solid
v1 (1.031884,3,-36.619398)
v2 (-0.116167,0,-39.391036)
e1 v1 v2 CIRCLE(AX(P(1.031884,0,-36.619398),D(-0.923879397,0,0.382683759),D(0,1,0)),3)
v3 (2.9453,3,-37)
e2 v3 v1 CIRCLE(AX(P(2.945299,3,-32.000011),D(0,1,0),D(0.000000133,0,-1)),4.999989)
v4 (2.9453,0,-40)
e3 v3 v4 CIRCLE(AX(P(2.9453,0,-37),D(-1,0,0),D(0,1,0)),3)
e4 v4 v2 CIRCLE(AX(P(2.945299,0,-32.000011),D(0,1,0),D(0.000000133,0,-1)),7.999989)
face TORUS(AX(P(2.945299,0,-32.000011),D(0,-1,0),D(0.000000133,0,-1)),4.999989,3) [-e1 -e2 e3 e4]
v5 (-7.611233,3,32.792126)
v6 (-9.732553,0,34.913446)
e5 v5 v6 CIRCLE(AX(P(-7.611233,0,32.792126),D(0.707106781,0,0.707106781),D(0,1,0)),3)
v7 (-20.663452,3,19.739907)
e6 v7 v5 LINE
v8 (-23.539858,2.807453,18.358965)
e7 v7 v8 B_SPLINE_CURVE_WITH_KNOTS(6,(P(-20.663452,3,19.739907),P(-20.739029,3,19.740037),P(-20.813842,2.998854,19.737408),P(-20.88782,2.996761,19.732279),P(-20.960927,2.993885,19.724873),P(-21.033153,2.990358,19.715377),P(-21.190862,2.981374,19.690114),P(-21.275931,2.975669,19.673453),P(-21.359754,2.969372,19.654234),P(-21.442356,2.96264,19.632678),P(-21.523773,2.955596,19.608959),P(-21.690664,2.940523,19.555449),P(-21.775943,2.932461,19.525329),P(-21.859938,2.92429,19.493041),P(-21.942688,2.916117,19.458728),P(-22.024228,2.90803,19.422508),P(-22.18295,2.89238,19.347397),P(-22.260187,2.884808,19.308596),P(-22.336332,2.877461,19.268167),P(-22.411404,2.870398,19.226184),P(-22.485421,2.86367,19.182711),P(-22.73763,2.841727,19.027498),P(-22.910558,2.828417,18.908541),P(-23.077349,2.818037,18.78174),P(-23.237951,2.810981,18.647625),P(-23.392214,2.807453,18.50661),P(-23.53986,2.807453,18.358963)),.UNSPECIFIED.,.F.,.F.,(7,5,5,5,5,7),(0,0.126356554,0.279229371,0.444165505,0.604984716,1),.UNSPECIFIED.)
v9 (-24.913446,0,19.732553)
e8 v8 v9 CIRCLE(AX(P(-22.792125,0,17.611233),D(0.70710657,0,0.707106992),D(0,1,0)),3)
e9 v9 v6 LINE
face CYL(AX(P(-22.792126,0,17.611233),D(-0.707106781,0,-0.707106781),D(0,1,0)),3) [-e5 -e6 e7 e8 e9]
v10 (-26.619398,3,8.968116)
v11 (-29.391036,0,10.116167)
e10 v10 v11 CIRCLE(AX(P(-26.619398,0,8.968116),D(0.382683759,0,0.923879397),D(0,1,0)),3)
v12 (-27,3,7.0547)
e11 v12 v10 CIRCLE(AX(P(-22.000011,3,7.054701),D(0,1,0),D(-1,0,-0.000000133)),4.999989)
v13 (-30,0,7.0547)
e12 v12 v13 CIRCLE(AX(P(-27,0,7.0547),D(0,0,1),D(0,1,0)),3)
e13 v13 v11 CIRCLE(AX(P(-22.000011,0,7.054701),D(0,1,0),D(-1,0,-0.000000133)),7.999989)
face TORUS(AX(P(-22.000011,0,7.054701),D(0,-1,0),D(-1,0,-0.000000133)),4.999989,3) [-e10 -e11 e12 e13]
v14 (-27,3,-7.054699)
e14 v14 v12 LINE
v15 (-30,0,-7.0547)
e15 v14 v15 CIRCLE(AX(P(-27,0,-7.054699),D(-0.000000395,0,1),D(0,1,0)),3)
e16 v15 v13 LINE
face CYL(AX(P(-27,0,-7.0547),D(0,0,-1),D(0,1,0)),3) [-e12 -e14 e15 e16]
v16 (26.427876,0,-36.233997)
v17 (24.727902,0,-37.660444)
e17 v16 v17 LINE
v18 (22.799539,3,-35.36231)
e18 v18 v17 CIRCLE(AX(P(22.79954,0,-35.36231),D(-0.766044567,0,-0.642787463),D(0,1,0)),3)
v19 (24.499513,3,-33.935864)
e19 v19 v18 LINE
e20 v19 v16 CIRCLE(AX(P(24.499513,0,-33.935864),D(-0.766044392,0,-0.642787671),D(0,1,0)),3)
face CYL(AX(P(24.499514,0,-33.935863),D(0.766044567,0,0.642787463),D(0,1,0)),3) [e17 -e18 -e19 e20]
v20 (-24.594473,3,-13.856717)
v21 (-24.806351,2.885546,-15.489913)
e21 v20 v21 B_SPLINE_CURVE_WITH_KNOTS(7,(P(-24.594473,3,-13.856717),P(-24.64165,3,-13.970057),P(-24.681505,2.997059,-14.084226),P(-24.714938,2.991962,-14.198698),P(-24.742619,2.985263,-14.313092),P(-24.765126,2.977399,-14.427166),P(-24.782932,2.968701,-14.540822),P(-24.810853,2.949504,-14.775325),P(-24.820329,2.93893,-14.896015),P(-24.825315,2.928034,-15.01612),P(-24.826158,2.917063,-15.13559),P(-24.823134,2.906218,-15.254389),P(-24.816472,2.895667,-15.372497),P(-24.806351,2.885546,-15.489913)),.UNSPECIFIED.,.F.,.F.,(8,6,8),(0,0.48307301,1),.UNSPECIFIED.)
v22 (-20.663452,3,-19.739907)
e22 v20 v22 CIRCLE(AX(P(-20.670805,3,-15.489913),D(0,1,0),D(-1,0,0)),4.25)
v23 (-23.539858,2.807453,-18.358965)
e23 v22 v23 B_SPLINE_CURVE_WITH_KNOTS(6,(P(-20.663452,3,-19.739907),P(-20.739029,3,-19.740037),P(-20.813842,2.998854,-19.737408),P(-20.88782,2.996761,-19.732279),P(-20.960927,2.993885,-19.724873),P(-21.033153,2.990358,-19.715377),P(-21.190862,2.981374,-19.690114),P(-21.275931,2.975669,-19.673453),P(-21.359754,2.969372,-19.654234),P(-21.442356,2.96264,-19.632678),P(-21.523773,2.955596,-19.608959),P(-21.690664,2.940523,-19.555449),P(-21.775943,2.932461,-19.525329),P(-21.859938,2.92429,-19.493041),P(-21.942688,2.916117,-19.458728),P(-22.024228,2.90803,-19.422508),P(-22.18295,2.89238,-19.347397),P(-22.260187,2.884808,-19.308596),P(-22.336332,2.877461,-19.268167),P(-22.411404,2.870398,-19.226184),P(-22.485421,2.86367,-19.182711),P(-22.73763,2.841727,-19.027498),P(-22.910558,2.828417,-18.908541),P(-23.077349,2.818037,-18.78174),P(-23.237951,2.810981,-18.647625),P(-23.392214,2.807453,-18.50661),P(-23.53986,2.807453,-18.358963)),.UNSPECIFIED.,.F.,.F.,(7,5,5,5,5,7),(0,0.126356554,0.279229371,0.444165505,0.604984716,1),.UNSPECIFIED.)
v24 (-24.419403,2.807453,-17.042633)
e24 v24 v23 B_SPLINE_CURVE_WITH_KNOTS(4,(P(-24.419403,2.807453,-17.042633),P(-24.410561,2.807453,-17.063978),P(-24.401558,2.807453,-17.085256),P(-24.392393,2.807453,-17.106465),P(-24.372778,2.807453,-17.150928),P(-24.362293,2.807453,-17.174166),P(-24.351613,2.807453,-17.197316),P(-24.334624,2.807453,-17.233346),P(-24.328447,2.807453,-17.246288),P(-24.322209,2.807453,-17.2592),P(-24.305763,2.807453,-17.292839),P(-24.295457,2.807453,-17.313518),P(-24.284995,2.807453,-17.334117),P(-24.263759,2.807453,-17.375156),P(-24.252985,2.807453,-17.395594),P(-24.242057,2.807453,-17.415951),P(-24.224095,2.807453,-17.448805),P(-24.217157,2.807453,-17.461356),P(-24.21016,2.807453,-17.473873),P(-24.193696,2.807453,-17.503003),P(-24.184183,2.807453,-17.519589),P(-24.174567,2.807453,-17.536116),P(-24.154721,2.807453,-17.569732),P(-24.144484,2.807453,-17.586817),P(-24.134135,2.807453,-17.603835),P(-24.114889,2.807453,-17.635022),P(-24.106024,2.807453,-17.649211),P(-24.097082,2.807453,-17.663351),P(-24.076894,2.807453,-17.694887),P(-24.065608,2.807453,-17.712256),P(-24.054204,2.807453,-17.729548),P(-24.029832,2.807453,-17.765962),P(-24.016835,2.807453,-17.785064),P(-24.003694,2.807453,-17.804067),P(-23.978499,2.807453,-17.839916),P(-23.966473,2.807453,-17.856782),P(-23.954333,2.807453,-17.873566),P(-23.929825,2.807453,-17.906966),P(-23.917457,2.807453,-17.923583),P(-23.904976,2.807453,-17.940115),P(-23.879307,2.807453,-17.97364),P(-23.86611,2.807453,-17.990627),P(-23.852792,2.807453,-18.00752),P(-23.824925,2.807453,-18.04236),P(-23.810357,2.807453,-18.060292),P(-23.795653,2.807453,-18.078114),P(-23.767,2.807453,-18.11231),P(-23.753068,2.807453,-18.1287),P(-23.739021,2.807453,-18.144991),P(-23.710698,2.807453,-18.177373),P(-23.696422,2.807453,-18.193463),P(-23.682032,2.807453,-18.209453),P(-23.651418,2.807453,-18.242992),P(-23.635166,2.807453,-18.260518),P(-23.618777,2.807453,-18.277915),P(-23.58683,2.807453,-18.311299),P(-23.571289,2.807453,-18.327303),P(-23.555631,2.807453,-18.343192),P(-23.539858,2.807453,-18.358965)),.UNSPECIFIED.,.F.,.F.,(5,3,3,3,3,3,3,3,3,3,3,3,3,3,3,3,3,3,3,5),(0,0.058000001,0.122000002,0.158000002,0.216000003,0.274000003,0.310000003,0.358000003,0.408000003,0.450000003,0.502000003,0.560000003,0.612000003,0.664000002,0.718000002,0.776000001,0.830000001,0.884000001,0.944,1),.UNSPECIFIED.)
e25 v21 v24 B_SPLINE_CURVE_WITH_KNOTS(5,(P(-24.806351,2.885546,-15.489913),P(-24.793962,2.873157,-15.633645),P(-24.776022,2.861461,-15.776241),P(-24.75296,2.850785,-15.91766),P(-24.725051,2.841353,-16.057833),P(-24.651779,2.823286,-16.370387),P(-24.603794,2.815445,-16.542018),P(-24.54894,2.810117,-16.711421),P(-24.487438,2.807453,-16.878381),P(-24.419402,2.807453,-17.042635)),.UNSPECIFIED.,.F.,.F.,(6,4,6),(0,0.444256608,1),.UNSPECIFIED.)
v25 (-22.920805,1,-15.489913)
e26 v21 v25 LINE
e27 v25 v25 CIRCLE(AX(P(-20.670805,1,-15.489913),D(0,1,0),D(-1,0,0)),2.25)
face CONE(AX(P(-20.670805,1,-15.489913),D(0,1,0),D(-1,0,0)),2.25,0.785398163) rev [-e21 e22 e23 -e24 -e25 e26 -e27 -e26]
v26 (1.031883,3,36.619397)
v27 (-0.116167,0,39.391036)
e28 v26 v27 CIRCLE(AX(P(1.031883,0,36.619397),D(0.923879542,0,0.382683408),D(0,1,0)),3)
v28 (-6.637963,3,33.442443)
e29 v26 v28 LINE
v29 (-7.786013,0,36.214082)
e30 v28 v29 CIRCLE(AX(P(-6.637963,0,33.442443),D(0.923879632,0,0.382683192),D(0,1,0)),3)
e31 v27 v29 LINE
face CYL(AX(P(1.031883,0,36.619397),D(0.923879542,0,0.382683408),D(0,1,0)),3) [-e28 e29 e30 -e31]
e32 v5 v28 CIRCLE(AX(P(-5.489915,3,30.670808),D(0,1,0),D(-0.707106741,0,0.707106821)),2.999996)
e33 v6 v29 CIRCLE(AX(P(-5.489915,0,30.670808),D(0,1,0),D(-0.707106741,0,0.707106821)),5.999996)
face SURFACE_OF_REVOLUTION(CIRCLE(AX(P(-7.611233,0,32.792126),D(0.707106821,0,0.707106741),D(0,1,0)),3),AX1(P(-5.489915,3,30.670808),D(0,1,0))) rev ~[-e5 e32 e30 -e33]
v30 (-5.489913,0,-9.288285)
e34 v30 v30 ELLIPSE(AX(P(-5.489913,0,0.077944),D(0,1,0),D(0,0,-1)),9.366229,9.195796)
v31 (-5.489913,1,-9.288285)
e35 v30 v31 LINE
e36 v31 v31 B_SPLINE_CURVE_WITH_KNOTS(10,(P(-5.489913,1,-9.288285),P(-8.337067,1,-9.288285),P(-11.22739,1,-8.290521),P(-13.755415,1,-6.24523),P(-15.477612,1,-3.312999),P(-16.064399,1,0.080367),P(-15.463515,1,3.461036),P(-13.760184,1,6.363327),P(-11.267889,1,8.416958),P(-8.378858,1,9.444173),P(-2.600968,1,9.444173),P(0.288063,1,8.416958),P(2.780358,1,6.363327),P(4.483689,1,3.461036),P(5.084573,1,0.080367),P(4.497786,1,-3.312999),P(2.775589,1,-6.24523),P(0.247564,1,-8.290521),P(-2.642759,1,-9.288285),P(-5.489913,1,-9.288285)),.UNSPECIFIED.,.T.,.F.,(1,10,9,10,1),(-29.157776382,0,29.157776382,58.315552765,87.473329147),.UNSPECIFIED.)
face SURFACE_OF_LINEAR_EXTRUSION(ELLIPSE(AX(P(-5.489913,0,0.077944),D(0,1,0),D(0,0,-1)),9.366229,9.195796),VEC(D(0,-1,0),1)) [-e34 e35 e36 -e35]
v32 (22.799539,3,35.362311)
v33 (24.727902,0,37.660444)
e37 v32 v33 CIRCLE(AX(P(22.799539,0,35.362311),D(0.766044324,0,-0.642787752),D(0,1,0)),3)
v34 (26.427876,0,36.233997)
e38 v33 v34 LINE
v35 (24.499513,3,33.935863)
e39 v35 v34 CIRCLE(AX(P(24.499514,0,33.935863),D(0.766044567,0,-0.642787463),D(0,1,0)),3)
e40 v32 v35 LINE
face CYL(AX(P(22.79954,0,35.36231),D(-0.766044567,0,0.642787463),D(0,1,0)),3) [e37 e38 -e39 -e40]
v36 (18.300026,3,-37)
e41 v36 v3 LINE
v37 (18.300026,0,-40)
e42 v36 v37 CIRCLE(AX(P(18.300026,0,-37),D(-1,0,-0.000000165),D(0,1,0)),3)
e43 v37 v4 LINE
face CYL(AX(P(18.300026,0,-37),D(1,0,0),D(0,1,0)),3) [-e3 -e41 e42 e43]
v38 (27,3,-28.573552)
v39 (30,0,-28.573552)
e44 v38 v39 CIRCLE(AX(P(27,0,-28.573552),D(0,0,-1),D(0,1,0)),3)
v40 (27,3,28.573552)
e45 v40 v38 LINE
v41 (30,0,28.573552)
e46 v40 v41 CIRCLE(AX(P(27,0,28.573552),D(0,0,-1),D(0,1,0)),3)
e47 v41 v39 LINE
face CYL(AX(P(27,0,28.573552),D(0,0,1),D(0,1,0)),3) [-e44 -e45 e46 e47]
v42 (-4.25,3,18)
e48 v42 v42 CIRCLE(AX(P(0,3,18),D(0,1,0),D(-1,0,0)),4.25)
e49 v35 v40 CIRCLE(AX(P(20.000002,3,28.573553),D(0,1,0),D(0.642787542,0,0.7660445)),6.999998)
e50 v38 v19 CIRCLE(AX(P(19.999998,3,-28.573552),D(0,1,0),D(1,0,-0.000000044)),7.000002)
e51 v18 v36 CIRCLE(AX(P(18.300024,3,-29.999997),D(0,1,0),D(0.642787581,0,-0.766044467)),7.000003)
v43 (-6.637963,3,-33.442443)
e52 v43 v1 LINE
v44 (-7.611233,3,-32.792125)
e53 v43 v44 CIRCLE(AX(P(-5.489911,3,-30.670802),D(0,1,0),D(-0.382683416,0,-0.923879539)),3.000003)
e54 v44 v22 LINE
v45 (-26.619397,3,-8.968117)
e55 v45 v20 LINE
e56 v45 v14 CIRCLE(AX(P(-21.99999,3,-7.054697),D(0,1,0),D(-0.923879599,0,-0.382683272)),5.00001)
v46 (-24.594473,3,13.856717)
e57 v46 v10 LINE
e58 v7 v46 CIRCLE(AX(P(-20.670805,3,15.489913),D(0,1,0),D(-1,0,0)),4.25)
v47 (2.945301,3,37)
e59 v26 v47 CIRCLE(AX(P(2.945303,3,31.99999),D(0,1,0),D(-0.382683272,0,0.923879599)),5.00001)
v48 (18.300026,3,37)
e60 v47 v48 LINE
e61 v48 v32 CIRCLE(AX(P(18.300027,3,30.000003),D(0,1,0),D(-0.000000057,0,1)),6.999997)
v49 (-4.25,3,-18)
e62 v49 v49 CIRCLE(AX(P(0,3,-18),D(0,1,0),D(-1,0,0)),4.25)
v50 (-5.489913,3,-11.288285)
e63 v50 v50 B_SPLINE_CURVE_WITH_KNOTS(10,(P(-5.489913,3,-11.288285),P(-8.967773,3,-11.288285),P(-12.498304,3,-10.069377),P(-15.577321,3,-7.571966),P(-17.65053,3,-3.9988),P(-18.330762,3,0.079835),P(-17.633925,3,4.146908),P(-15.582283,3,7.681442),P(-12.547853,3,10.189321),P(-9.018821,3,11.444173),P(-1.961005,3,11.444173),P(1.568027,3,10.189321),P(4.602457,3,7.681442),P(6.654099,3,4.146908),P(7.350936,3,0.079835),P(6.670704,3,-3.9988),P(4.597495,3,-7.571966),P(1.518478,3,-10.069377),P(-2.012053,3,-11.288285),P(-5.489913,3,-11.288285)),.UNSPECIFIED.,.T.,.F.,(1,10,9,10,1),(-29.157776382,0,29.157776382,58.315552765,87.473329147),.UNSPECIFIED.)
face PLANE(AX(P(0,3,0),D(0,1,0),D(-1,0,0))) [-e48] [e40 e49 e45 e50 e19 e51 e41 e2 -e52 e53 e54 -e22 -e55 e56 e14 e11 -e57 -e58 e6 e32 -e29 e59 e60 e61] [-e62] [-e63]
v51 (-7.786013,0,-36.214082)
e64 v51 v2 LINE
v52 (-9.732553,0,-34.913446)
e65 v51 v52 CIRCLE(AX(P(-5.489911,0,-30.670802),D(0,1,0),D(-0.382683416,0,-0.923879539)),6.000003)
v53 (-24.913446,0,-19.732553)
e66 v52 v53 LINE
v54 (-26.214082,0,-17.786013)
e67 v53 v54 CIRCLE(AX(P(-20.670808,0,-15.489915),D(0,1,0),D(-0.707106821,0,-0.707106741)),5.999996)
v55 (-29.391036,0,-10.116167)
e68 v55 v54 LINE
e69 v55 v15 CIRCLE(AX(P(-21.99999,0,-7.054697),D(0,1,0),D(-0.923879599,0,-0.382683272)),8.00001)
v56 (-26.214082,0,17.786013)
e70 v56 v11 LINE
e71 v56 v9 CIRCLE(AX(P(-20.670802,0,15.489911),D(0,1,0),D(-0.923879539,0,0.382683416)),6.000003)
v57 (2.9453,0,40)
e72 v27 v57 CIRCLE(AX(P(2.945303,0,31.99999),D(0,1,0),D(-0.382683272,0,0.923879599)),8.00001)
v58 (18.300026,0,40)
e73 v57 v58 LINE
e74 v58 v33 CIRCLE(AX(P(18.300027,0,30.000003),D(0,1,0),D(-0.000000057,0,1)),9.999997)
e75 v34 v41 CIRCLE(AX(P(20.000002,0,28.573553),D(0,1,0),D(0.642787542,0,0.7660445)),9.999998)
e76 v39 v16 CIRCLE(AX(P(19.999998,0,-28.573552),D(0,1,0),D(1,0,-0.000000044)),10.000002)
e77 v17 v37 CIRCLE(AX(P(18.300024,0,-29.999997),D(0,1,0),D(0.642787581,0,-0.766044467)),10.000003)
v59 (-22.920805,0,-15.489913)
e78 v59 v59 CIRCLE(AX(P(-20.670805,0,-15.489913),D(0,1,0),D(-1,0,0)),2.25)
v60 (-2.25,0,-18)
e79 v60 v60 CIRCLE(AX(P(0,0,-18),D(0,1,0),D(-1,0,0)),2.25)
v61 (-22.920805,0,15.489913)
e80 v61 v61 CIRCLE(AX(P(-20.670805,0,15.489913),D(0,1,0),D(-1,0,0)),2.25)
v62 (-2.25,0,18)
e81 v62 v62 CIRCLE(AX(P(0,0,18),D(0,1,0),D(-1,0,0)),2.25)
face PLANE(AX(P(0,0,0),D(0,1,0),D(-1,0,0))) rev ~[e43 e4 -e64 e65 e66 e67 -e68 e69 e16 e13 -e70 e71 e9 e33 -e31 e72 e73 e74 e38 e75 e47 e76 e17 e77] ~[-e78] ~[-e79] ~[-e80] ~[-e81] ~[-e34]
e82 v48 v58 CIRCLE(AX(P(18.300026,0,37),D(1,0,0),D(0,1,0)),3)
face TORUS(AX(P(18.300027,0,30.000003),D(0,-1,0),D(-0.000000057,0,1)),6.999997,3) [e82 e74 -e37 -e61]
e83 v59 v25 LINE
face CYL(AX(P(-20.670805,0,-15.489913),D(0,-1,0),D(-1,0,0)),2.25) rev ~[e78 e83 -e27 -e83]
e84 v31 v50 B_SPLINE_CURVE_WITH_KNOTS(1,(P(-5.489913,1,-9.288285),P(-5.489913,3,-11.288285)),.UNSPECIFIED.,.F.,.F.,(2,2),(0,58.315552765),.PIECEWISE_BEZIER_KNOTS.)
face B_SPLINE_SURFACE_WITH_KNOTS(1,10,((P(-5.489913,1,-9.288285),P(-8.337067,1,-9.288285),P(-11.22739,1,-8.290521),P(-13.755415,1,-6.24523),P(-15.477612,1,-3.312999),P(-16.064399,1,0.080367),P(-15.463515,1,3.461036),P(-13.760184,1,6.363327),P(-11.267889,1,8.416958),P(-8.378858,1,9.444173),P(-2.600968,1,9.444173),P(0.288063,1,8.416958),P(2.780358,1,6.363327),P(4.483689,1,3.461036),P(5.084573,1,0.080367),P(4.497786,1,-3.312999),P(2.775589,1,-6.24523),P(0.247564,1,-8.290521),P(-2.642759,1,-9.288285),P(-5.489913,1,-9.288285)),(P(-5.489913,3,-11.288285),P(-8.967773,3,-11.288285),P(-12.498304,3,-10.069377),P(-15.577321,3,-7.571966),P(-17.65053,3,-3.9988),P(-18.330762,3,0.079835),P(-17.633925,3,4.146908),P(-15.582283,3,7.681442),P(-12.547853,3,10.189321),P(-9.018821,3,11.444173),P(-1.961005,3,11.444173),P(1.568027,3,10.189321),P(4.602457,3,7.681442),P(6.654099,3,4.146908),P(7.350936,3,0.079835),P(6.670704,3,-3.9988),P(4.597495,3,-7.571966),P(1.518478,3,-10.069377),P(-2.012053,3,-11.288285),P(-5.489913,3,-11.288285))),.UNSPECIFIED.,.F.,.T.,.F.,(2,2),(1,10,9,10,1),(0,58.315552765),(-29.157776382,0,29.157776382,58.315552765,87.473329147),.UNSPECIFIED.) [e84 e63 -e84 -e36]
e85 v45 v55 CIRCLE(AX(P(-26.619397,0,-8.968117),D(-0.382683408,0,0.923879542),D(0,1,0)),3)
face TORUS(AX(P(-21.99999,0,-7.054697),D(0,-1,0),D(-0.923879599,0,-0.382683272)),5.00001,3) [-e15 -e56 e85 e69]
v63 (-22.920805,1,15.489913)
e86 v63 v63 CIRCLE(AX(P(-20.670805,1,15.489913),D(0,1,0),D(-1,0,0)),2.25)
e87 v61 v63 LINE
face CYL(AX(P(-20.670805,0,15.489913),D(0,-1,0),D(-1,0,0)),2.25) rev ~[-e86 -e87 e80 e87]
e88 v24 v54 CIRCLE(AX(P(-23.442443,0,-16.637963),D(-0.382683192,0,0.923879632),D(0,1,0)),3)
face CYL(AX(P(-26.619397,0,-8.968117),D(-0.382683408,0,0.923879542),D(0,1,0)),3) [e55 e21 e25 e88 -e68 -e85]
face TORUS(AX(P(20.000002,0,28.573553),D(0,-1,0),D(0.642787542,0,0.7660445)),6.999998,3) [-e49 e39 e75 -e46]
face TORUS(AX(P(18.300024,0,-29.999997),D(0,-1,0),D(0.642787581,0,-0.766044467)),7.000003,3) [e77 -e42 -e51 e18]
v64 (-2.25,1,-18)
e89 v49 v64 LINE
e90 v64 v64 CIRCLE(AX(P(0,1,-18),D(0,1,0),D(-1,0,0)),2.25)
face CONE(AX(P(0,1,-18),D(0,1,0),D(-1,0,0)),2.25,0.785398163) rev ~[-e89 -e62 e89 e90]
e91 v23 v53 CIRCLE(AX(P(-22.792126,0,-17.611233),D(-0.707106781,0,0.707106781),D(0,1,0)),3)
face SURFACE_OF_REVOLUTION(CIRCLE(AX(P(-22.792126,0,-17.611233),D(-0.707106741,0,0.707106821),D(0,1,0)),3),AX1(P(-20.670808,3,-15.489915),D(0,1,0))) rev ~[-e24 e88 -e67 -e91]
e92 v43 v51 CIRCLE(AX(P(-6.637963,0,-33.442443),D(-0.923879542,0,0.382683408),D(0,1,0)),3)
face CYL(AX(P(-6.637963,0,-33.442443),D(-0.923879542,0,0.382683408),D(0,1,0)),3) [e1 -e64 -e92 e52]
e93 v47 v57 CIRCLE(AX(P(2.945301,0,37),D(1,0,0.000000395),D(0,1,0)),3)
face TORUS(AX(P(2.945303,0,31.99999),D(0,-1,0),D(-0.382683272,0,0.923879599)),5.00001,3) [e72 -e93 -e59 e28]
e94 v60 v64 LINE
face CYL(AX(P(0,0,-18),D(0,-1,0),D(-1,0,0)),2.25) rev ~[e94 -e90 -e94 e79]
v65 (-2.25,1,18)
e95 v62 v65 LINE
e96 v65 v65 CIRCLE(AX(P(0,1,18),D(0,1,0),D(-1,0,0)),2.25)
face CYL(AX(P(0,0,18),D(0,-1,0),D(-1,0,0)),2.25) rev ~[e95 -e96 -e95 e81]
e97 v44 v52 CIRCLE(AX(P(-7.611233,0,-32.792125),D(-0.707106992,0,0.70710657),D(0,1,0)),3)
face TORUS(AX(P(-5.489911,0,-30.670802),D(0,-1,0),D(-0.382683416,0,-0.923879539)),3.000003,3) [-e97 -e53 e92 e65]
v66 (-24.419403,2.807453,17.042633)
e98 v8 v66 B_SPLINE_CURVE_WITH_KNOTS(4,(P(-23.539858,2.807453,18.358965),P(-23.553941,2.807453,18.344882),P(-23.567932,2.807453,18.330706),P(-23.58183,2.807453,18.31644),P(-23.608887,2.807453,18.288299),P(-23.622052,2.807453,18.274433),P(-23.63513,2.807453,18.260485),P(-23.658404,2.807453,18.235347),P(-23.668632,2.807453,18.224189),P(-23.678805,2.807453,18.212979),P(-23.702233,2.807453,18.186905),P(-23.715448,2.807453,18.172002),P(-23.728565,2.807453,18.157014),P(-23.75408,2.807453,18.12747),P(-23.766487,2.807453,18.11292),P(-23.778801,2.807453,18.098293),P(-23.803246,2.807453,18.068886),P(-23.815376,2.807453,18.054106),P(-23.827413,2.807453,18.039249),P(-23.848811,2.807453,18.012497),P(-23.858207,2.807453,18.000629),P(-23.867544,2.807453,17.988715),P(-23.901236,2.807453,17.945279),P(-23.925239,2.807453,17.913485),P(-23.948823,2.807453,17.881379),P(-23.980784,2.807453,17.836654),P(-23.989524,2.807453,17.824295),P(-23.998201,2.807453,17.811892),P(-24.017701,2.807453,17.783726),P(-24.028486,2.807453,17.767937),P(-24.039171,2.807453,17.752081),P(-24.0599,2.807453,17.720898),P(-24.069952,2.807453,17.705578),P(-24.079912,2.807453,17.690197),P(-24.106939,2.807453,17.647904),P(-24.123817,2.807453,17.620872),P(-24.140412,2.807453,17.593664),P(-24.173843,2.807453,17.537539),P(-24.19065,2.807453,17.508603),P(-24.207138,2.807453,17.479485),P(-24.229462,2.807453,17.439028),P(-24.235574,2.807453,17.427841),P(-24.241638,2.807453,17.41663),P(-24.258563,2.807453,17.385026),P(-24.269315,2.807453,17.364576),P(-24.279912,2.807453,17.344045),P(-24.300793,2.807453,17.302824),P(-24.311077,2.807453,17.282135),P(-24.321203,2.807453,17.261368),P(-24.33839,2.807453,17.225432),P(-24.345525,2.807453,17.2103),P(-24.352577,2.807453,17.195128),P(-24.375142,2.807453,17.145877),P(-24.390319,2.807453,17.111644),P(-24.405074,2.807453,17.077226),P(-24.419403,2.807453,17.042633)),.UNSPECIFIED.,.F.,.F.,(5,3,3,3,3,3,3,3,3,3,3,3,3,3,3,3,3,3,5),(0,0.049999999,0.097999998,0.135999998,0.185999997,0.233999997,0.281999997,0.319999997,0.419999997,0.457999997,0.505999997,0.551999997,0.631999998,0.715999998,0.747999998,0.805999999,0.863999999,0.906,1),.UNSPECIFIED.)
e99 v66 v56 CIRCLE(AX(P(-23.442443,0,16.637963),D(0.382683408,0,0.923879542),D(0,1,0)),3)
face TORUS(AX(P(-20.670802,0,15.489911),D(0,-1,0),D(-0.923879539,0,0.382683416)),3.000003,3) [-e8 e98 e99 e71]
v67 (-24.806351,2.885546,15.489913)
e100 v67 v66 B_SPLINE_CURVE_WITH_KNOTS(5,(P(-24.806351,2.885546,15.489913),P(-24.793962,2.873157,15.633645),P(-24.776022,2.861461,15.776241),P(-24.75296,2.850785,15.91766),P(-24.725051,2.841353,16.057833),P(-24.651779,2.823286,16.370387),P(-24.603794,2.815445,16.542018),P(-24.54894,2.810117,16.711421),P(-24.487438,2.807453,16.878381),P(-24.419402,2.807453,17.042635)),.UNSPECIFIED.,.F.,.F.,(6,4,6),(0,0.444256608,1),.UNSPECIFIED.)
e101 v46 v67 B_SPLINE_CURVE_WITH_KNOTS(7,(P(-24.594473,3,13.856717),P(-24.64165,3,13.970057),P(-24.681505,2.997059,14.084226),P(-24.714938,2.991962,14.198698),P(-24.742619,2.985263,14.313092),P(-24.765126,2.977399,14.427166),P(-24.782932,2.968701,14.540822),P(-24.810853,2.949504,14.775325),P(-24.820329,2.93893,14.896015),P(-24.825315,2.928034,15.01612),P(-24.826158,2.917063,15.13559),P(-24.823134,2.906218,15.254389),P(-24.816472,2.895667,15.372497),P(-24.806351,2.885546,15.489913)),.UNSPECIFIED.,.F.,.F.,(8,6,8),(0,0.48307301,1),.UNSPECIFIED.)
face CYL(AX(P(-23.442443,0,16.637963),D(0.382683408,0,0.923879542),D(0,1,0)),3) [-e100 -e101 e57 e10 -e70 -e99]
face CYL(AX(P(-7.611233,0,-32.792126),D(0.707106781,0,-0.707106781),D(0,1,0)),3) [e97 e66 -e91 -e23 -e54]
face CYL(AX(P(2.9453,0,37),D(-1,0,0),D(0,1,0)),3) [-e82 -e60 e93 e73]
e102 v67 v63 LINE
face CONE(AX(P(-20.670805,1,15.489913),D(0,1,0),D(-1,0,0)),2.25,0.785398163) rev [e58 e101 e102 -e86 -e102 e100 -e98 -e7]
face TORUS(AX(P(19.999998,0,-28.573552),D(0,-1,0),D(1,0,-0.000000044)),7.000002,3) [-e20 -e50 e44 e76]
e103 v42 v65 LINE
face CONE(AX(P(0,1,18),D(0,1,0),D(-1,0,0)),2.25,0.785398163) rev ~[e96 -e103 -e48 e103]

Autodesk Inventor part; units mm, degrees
ref_plane "YZ Plane" through (0, 0, 0) normal (1, 0, 0) x (0, 1, 0)
ref_plane "XZ Plane" through (0, 0, 0) normal (0, 1, 0) x (-1, 0, 0)
ref_plane "XY Plane" through (0, 0, 0) normal (0, 0, 1) x (1, 0, 0)
sketch "Szkic1" plane through (0, 0, 0) normal (0, 1, 0) x (-1, 0, 0)
  circle A0 centre (20.670805, 15.489913) radius 2.25
  circle A1 centre (20.670805, -15.489913) radius 2.25
  line L0 (-2.43121, 25.942308) -> (-19.284188, 11.800981)
  line L1 (-19.284188, 11.800981) -> (-28.926002, 23.291647)
  line L2 (-28.802745, 24.700479) -> (-28.926002, 23.291647)
  line L3 (-28.802745, 24.700479) -> (-12.715812, 38.199019)
  line L4 (-12.715812, 38.199019) -> (-2.43121, 25.942308)
  line L5 (-26.423342, -11) -> (-26.423342, 11)
  line L6 (-26.423342, 11) -> (-10.423342, 11)
  line L7 (-10.423342, 11) -> (-10.423342, -11)
  line L8 (-10.423342, -11) -> (-26.423342, -11)
  line L9 (-19.284188, -11.800981) -> (-2.43121, -25.942308)
  line L10 (-2.43121, -25.942308) -> (-12.715812, -38.199019)
  line L11 (-12.715812, -38.199019) -> (-28.802745, -24.700479)
  line L12 (-28.926002, -23.291647) -> (-28.802745, -24.700479)
  line L13 (-28.926002, -23.291647) -> (-19.284188, -11.800981)
  arc A2 (24.913446, -19.732553) -> (26.214082, -17.786013) centre (20.670805, -15.489913) ccw
  line L14 (29.391036, -10.116167) -> (26.214082, -17.786013)
  arc A3 (29.391036, -10.116167) -> (30, -7.0547) centre (22, -7.0547) ccw
  line L15 (30, -7.0547) -> (30, 7.0547)
  arc A4 (30, 7.0547) -> (29.391036, 10.116167) centre (22, 7.0547) ccw
  line L16 (26.214082, 17.786013) -> (29.391036, 10.116167)
  arc A5 (26.214082, 17.786013) -> (24.913446, 19.732553) centre (20.670805, 15.489913) ccw
  line L17 (24.913446, 19.732553) -> (9.732553, 34.913446)
  arc A6 (9.732553, 34.913446) -> (7.786013, 36.214082) centre (5.489913, 30.670805) ccw
  line L18 (0.116167, 39.391036) -> (7.786013, 36.214082)
  arc A7 (0.116167, 39.391036) -> (-2.9453, 40) centre (-2.9453, 32) ccw
  line L19 (-2.9453, 40) -> (-18.300026, 40)
  arc A8 (-18.300026, 40) -> (-24.727902, 37.660444) centre (-18.300026, 30) ccw
  line L20 (-24.727902, 37.660444) -> (-26.427876, 36.233997)
  arc A9 (-26.427876, 36.233997) -> (-30, 28.573552) centre (-20, 28.573552) ccw
  line L21 (-30, 28.573552) -> (-30, -28.573552)
  arc A10 (-30, -28.573552) -> (-26.427876, -36.233997) centre (-20, -28.573552) ccw
  line L22 (-26.427876, -36.233997) -> (-24.727902, -37.660444)
  arc A11 (-24.727902, -37.660444) -> (-18.300026, -40) centre (-18.300026, -30) ccw
  line L23 (-18.300026, -40) -> (-2.9453, -40)
  arc A12 (-2.9453, -40) -> (0.116167, -39.391036) centre (-2.9453, -32) ccw
  line L24 (7.786013, -36.214082) -> (0.116167, -39.391036)
  arc A13 (7.786013, -36.214082) -> (9.732553, -34.913446) centre (5.489913, -30.670805) ccw
  line L25 (9.732553, -34.913446) -> (24.913446, -19.732553)
  circle A14 centre (0, -18) radius 2.25
  circle A15 centre (0, 18) radius 2.25
  ellipse E0 centre (5.489913, 0.077944) end of major axis (-3.705883, 0.077944) minor radius 9.366229
  point P0 (0, 0)
  point P1 (0, 0)
extrude "Wyciągnięcie proste1" add sketch "Szkic1" along normal blind 3 contours L0 L1 L2 L3 L4 | L5 L6 L7 L8 | L9 L10 L11 L12 L13 | L25 A13 L24 A12 L23 A11 L22 A10 L21 A9 L20 A8 L19 A7 L18 A6 L17 A5 L16 A4 L15 A3 L14 A2
chamfer "Faza1" distance 2 angle 45 1 edges at (-5.4899, 3, 9.4442)
chamfer "Faza2" distance 2 angle 45 4 edges at (-18.4208, 3, 15.4899) (2.25, 3, 18) (-18.4208, 3, -15.4899) (2.25, 3, -18)
fillet "Zaokrąglenie1" radius 3 24 edges at (30, 3, 0) (29.0631, 3, -32.7997) (25.5779, 3, -36.9472) (21.7202, 3, -39.3969) (10.6227, 3, -40) (1.3846, 3, -39.8463) (-3.9511, 3, -37.8026) (-8.8233, 3, -35.6596) (-17.323, 3, -27.323) (-25.6596, 3, -18.8233) (-27.8026, 3, -13.9511) (-29.8463, 3, -8.6154) (-30, 3, 0) (-29.8463, 3, 8.6154) (-27.8026, 3, 13.9511) (-25.6596, 3, 18.8233) (-17.323, 3, 27.323) (-8.8233, 3, 35.6596) (-3.9511, 3, 37.8026) (1.3846, 3, 39.8463) (10.6227, 3, 40) (21.7202, 3, 39.3969) (25.5779, 3, 36.9472) (29.0631, 3, 32.7997)
properties part number "obudowa do czujnikow odleglosci v3,2 - przykrywka"
